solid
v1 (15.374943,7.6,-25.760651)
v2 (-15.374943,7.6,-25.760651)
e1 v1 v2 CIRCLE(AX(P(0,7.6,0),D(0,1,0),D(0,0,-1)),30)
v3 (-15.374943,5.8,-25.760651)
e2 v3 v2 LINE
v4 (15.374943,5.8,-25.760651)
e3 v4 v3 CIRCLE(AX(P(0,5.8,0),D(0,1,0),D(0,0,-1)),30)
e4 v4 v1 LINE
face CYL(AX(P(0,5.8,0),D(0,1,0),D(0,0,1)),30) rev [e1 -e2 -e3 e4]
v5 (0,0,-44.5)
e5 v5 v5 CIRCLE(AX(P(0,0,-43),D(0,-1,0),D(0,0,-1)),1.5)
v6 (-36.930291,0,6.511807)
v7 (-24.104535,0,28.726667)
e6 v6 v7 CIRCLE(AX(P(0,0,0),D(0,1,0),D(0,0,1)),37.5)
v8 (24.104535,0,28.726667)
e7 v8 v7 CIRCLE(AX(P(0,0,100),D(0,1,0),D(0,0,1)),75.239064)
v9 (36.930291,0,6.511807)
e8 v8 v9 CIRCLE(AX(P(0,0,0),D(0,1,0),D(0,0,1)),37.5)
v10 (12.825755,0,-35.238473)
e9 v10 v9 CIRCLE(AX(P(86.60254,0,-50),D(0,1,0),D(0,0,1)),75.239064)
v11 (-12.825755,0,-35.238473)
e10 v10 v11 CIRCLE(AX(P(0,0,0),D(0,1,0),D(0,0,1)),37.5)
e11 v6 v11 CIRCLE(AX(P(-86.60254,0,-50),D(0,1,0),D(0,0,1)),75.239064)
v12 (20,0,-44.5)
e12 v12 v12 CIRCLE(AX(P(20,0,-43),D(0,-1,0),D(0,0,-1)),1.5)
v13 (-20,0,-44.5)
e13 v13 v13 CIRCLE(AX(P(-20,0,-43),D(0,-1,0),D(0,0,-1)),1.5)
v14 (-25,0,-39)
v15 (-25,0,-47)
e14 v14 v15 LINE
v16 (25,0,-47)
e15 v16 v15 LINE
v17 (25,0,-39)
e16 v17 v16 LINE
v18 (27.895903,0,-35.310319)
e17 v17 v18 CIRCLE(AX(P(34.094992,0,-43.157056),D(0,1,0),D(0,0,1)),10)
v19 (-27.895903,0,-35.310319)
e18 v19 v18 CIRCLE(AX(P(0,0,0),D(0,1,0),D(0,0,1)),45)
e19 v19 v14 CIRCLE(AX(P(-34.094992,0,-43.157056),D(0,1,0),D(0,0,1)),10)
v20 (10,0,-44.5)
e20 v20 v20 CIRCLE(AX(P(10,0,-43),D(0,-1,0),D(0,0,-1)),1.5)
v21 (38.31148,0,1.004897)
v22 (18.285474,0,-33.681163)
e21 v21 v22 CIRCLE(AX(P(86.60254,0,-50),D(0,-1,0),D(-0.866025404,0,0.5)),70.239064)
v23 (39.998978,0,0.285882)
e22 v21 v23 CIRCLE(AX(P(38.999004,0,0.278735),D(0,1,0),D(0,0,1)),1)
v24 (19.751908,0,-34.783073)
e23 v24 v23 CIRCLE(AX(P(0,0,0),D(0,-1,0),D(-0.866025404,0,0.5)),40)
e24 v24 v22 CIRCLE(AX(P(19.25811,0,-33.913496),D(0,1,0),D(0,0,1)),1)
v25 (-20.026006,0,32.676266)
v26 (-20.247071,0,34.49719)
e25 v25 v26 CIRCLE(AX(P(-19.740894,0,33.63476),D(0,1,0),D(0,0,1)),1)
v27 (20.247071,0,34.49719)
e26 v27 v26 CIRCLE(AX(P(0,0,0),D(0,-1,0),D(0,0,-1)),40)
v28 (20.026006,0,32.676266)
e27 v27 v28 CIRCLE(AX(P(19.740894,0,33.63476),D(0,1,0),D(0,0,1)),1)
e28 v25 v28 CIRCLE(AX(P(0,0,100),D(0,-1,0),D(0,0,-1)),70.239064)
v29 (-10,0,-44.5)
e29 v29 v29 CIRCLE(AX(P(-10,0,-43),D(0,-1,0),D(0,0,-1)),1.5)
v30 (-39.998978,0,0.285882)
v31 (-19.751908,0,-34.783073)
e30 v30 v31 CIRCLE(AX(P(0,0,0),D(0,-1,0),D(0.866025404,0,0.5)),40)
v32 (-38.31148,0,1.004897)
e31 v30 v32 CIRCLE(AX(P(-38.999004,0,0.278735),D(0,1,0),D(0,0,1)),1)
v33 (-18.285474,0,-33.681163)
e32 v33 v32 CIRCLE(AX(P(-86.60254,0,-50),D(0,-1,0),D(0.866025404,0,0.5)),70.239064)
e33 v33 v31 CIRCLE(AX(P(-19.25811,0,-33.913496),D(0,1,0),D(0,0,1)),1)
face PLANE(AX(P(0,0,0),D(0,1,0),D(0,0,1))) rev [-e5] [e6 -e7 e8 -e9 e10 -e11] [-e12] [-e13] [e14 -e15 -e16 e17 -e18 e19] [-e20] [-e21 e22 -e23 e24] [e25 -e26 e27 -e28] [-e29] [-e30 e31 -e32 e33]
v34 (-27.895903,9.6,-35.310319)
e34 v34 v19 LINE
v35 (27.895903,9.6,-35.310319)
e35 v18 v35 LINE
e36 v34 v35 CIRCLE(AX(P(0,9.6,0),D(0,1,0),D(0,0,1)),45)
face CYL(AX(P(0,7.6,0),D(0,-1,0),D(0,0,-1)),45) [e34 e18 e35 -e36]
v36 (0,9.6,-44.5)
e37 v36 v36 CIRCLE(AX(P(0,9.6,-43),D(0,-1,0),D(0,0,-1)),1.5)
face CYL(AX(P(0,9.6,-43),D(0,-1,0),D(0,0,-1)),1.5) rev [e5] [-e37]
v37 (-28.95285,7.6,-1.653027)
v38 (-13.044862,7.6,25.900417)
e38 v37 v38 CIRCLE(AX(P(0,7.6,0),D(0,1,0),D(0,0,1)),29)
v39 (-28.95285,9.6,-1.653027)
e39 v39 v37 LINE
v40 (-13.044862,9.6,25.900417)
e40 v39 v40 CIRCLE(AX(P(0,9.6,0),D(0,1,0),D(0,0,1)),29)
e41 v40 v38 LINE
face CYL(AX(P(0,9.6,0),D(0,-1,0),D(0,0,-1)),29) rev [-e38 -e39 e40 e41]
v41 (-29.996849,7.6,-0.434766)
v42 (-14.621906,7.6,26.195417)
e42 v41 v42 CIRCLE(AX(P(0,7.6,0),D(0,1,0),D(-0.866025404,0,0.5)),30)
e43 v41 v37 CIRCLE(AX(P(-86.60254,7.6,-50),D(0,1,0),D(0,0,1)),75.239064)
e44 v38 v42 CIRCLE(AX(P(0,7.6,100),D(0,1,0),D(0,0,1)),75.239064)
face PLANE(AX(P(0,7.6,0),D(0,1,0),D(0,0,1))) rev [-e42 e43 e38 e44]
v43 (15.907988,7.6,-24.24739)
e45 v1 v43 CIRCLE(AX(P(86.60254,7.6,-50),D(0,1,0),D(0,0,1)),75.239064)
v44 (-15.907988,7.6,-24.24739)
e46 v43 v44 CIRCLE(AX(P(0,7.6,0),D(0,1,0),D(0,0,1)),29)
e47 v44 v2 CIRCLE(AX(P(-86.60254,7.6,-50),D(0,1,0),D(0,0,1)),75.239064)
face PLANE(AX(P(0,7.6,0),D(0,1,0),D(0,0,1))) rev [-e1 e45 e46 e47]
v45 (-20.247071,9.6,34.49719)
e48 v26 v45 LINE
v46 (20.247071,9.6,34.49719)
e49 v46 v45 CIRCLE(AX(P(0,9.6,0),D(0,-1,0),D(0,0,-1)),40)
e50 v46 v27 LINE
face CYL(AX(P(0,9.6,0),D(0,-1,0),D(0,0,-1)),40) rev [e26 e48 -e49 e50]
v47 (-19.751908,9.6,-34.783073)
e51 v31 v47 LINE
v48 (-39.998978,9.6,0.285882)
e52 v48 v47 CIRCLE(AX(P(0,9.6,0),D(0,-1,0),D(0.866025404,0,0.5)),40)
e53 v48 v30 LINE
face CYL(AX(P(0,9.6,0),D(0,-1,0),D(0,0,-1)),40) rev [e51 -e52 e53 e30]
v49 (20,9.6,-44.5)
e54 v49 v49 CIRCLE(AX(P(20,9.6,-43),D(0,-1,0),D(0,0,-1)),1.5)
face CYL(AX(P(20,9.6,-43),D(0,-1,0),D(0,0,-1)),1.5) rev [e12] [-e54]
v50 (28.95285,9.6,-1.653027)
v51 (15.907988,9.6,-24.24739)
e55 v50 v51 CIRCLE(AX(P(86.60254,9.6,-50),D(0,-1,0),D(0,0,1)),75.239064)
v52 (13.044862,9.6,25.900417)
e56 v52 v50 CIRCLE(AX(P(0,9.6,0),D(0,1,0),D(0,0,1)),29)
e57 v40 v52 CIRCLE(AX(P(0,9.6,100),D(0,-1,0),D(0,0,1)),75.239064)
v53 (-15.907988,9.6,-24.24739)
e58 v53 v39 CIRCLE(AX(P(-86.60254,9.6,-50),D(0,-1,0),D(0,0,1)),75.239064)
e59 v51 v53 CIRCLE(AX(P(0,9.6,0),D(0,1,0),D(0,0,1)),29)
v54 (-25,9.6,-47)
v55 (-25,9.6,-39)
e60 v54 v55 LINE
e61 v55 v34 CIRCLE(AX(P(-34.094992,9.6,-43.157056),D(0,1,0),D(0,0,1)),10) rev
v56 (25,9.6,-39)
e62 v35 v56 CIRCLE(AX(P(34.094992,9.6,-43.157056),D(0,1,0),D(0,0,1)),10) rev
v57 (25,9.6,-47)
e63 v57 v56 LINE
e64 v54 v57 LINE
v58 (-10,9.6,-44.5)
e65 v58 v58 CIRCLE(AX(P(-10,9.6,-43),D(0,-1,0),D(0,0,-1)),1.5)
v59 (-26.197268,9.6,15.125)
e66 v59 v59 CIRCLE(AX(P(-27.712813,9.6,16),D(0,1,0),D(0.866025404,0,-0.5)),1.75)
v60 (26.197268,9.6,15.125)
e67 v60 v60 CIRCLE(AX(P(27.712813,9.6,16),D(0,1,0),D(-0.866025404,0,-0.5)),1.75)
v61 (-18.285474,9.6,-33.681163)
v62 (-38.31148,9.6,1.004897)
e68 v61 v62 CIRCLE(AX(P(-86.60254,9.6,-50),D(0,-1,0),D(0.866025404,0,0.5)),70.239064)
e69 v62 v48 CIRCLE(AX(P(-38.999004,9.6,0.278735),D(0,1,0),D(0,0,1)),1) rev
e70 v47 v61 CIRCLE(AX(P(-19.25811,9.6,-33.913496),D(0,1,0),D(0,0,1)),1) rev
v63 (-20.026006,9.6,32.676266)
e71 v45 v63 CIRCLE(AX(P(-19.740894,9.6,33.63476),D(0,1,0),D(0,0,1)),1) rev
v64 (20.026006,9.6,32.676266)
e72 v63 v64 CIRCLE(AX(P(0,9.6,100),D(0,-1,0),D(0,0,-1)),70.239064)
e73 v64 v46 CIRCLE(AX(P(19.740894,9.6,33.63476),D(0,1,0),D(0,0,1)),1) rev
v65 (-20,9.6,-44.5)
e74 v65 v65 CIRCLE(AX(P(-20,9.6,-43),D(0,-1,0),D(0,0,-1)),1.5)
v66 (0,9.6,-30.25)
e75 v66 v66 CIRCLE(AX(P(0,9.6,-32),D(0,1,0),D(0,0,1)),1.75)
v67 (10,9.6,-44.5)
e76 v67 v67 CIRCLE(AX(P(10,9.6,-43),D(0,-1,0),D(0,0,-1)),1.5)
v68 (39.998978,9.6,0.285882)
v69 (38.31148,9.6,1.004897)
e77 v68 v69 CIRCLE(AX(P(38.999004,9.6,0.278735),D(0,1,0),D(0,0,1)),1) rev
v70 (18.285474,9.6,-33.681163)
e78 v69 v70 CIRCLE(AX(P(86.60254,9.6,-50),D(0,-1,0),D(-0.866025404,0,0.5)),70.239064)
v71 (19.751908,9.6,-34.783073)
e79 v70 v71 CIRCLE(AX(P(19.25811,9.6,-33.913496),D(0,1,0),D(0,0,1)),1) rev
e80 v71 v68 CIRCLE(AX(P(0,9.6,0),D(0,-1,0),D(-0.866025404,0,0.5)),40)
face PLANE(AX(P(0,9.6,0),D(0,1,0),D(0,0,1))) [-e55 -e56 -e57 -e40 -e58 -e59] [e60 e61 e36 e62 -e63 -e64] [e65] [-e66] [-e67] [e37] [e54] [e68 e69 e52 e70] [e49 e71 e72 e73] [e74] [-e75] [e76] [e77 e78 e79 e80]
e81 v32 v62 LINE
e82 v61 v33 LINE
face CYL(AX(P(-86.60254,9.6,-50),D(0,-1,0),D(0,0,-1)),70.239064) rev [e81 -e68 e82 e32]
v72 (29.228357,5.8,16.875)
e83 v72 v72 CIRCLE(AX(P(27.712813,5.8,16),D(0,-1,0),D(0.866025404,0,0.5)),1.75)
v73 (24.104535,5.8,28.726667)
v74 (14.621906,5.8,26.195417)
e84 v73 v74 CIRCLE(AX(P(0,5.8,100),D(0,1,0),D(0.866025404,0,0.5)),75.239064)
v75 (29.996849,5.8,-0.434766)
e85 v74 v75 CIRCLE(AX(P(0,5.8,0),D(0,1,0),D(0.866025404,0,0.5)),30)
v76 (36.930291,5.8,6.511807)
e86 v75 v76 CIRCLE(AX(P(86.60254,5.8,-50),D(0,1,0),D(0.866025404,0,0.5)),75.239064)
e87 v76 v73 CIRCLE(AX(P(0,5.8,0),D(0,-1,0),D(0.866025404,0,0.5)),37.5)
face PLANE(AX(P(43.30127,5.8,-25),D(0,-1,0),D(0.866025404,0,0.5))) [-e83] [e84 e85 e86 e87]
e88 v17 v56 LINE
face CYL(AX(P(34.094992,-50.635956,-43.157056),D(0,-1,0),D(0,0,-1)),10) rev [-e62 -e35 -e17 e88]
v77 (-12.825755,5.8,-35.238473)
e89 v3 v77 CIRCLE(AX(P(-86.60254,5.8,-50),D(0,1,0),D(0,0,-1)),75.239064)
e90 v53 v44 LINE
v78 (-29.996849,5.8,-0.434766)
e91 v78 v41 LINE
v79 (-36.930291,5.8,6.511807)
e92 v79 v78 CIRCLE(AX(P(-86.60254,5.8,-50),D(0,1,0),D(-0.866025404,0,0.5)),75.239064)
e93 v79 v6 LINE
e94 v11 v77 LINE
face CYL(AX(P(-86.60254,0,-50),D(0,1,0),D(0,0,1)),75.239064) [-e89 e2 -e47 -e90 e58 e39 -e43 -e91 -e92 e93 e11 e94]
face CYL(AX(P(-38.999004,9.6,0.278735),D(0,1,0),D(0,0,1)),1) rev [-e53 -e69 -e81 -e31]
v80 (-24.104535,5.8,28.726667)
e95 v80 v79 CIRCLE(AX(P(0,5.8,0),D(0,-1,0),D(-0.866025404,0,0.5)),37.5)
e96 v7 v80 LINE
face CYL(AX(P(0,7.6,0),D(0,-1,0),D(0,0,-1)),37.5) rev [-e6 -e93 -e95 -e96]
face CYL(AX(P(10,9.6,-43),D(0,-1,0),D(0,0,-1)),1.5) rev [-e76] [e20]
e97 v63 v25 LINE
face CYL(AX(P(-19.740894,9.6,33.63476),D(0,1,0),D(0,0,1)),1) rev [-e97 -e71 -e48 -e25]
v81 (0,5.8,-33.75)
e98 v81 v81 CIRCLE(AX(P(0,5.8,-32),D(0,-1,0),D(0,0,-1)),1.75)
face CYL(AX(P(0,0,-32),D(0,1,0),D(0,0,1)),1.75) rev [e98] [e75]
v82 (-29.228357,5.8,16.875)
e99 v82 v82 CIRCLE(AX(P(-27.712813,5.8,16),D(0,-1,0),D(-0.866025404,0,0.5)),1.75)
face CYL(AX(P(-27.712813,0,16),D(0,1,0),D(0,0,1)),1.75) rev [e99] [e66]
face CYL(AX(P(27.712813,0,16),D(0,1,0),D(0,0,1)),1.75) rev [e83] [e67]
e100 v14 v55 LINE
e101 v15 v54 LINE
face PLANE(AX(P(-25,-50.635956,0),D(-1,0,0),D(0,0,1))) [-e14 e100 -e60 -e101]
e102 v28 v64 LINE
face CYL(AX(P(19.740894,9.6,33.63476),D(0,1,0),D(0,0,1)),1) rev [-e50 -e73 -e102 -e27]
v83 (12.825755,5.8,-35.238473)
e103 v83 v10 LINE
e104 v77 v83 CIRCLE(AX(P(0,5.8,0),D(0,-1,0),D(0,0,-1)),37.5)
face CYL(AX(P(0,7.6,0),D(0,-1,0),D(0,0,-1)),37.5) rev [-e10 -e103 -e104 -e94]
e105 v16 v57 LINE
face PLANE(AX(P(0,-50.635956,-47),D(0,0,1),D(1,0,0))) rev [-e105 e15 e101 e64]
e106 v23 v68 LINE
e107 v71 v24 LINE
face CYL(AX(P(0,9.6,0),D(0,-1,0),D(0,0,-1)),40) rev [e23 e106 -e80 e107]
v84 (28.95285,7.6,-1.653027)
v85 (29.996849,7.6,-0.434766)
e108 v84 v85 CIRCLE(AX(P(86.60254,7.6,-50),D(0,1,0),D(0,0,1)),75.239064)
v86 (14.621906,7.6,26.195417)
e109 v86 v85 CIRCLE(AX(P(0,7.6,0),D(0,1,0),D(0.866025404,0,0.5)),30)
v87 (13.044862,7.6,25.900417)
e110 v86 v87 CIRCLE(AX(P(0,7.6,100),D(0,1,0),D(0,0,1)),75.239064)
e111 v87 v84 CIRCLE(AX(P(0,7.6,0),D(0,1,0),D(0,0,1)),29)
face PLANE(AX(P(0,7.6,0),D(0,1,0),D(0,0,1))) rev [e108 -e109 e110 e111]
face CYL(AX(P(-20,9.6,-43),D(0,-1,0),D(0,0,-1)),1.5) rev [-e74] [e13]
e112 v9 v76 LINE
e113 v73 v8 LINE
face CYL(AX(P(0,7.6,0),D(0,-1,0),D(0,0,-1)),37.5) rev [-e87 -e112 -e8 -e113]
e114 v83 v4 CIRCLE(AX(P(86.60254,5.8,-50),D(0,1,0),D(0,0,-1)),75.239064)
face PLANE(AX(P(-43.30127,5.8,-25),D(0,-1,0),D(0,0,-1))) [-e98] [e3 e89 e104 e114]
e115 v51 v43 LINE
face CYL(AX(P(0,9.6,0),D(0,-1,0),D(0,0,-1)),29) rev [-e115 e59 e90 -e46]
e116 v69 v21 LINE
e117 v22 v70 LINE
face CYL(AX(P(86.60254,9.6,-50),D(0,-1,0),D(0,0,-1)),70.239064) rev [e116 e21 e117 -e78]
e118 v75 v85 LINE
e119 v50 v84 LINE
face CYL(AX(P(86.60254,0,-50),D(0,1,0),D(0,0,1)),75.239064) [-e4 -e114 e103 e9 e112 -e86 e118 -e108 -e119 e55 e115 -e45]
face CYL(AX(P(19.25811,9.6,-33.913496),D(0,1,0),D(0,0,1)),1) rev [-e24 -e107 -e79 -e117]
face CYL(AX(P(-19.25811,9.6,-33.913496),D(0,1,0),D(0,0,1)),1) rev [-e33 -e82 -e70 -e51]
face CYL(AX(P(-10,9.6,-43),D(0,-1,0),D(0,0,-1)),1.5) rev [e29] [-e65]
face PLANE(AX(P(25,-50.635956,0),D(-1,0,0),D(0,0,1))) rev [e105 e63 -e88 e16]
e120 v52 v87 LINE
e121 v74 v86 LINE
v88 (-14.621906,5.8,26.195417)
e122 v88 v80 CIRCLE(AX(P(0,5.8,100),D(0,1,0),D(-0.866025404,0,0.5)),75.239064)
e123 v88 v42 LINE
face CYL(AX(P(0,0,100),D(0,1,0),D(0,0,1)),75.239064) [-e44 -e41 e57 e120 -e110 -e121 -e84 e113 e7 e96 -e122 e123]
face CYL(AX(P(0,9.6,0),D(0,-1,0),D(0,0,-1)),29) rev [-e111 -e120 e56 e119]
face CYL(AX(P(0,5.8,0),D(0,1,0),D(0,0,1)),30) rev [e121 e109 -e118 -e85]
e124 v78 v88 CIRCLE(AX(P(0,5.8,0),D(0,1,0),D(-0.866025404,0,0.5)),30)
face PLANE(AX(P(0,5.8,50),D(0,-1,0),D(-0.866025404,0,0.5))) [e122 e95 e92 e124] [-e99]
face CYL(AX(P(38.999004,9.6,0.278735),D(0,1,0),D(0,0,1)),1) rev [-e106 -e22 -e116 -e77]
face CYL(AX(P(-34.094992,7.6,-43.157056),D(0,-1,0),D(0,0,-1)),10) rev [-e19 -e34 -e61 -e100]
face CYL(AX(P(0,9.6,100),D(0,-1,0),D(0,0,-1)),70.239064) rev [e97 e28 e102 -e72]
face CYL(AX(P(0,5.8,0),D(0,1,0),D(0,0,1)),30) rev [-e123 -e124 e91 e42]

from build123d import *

# Parameters (mm, degrees)
SKETCH1_R                = 37.5
BOSS_EXTRUDE1_DEPTH      = 7.6
CUT_EXTRUDE2_START       = -7.6
CUT_EXTRUDE2_DEPTH       = 7.6
SKETCH4_R                = 45
SKETCH4_R_2              = 37.5
BOSS_EXTRUDE2_DEPTH      = 7.6
SKETCH6_R                = 45
BOSS_EXTRUDE3_DEPTH      = 2
SKETCH7_R                = 1.75
CUT_EXTRUDE3_DEPTH       = 65.359614666
CIRPATTERN2_COUNT        = 3
BOSS_EXTRUDE4_START      = -9.6
BOSS_EXTRUDE4_DEPTH      = 9.6
FILLET1_R                = 10
SKETCH12_R               = 1.5
CUT_EXTRUDE6_DEPTH       = 66.773550915
LPATTERN1_COUNT          = 10
LPATTERN1_PITCH          = 10
CUT_EXTRUDE7_DEPTH       = 66.773550915
FILLET3_R                = 1
CIRPATTERN3_COUNT        = 3
FILLET3_OF_CIRPATTERN3_R = 1
BOSS_EXTRUDE5_START      = 1.8
SKETCH14_R               = 1.75
BOSS_EXTRUDE5_DEPTH      = 1.8
CIRPATTERN4_COUNT        = 3


# Read off the part's stored shape, not the designer's step: Cut-Extrude2
with BuildPart() as part:
    # Sketch1 → Boss-Extrude1 (new body)
    with BuildSketch(Plane(origin=(0, 0, 0), x_dir=(1, 0, 0), z_dir=(0, 1, 0))):
        with Locations(Location((0, 0, 0), (0, 0, 90))):
            Circle(SKETCH1_R)
    extrude(amount=BOSS_EXTRUDE1_DEPTH)

    # Cut-Extrude2 outline → Cut-Extrude2 (cut)
    with BuildSketch(Plane(origin=(0, 7.6, 0), x_dir=(1, 0, 0), z_dir=(0, 1, 0)).offset(CUT_EXTRUDE2_START)):
        with BuildLine():
            ThreePointArc((-24.104535363, -28.726666617), (0, -24.760936498), (24.104535363, -28.726666617))
            ThreePointArc((24.104535363, -28.726666617), (32.475952642, -18.75), (36.930290738, -6.511806663))
            ThreePointArc((36.930290738, -6.511806663), (21.443600029, 12.380468249), (12.825755375, 35.238473279))
            ThreePointArc((12.825755375, 35.238473279), (0, 37.5), (-12.825755375, 35.238473279))
            ThreePointArc((-12.825755375, 35.238473279), (-21.443600029, 12.380468249), (-36.930290738, -6.511806663))
            ThreePointArc((-36.930290738, -6.511806663), (-32.475952642, -18.75), (-24.104535363, -28.726666617))
        make_face()
    extrude(amount=CUT_EXTRUDE2_DEPTH, mode=Mode.SUBTRACT)

    # Sketch4 → Boss-Extrude2 (add)
    with BuildSketch(Plane(origin=(0, 0, 0), x_dir=(1, 0, 0), z_dir=(0, 1, 0))):
        with Locations(Location((0, 0, 0), (0, 0, 90))):
            Circle(SKETCH4_R)
        Circle(SKETCH4_R_2, mode=Mode.SUBTRACT)
    extrude(amount=BOSS_EXTRUDE2_DEPTH)

    # Sketch6 → Boss-Extrude3 (add)
    with BuildSketch(Plane(origin=(0, 7.6, 0), x_dir=(1, 0, 0), z_dir=(0, 1, 0))):
        with Locations(Location((0, 0, 0), (0, 0, 90))):
            Circle(SKETCH6_R)
        with BuildLine():
            ThreePointArc((-28.952849653, 1.653026611), (-25.11473671, -14.5), (-13.044861788, -25.900416617))
            ThreePointArc((-13.044861788, -25.900416617), (0, -24.760936498), (13.044861788, -25.900416617))
            ThreePointArc((13.044861788, -25.900416617), (25.11473671, -14.5), (28.952849653, 1.653026611))
            ThreePointArc((28.952849653, 1.653026611), (21.443600029, 12.380468249), (15.907987865, 24.247390006))
            ThreePointArc((15.907987865, 24.247390006), (0, 29), (-15.907987865, 24.247390006))
            ThreePointArc((-15.907987865, 24.247390006), (-21.443600029, 12.380468249), (-28.952849653, 1.653026611))
        make_face(mode=Mode.SUBTRACT)
    extrude(amount=BOSS_EXTRUDE3_DEPTH)

    # Sketch7 → Cut-Extrude3 (cut, through all)
    with BuildSketch(Plane(origin=(0, 9.6, 0), x_dir=(1, 0, 0), z_dir=(0, 1, 0))):
        with Locations(Location((0, 32, 0), (0, 0, 270))):
            Circle(SKETCH7_R)
    cut_extrude3 = extrude(amount=-CUT_EXTRUDE3_DEPTH, mode=Mode.SUBTRACT)

    # CirPattern2: Cut-Extrude3 ×3 about axis
    cirpattern2_axis = Axis((0, 0, 0), (0, 1, 0))
    for i in range(1, CIRPATTERN2_COUNT):
        add(cut_extrude3.rotate(cirpattern2_axis, i * 360 / CIRPATTERN2_COUNT), mode=Mode.SUBTRACT)

    # Sketch11 → Boss-Extrude4 (add)
    with BuildSketch(Plane(origin=(0, 9.6, 0), x_dir=(1, 0, 0), z_dir=(0, 1, 0)).offset(BOSS_EXTRUDE4_START)):
        with BuildLine():
            ThreePointArc((-22.449944321, 39), (0, 45), (22.449944321, 39))
            Line((22.449944321, 39), (25, 39))
            Line((25, 39), (25, 47))
            Line((25, 47), (-25, 47))
            Line((-25, 47), (-25, 39))
            Line((-25, 39), (-22.449944321, 39))
        make_face()
    extrude(amount=BOSS_EXTRUDE4_DEPTH)

    # Fillet1
    # the kernel refuses this fillet: 10 mm, written as the material it adds along each edge
    with BuildSketch(Plane(origin=(-22.449944321, 0, -39), x_dir=(-0.8278845523725272, 0, 0.5608985362282026), z_dir=(0, 1, 0))) as fillet1_piece_1:
        with BuildLine():
            CenterArc((7.309068463, -9.973252989), FILLET1_R, 94.191525444, 27.126753117)
            Line((2.111151705, -1.430322498), (0, 0))
            ThreePointArc((0, 0), (3.289080808, -0.12036155), (6.578161616, 0))
        make_face()
    extrude(amount=9.6)
    with BuildSketch(Plane(origin=(22.449944321, 0, -39), x_dir=(0.8278845523725283, 0, 0.560898536228201), z_dir=(0, 1, 0))) as fillet1_piece_2:
        with BuildLine():
            CenterArc((7.309068463, 9.973252989), FILLET1_R, 238.681721439, 27.126753117)
            Line((2.111151705, 1.430322498), (0, 0))
            ThreePointArc((0, 0), (3.289080808, 0.12036155), (6.578161616, 0))
        make_face()
    extrude(amount=9.6)

    # Sketch12 → Cut-Extrude6 (cut, through all)
    with BuildSketch(Plane.XZ):
        with Locations(Location((-20, -43, 0), (0, 0, 270))):
            Circle(SKETCH12_R)
    cut_extrude6 = extrude(amount=-CUT_EXTRUDE6_DEPTH, mode=Mode.SUBTRACT)

    # LPattern1: Cut-Extrude6 ×10
    with Locations(*[(i * LPATTERN1_PITCH, 0, 0) for i in range(1, LPATTERN1_COUNT)]):
        add(cut_extrude6, mode=Mode.SUBTRACT)

    # Sketch13 → Cut-Extrude7 (cut, through all)
    with BuildSketch(Plane.XZ):
        with BuildLine():
            ThreePointArc((-22.11228446, 33.332369792), (0, 29.760936498), (22.11228446, 33.332369792))
            ThreePointArc((22.11228446, 33.332369792), (0, 40), (-22.11228446, 33.332369792))
        make_face()
    cut_extrude7 = extrude(amount=-CUT_EXTRUDE7_DEPTH, mode=Mode.SUBTRACT)

    # Fillet3
    fillet3_edges = [part.edges().sort_by_distance(p)[0] for p in [
        (-22.11228446, 4.8, 33.332369792),
        (22.11228446, 4.8, 33.332369792),
    ]]
    fillet(fillet3_edges, radius=FILLET3_R)

    # CirPattern3: Cut-Extrude7 ×3 about axis
    cirpattern3_axis = Axis((0, 0, 0), (0, 1, 0))
    for i in range(1, CIRPATTERN3_COUNT):
        add(cut_extrude7.rotate(cirpattern3_axis, i * 360 / CIRPATTERN3_COUNT), mode=Mode.SUBTRACT)

    # Fillet3 of CirPattern3
    fillet3_of_cirpattern3_edges = [part.edges().sort_by_distance(p)[0] for p in [
        (39.922821238, 4.8, 2.483615182),
        (17.810536778, 4.8, -35.815984974),
        (-17.810536778, 4.8, -35.815984974),
        (-39.922821238, 4.8, 2.483615182),
    ]]
    fillet(fillet3_of_cirpattern3_edges, radius=FILLET3_OF_CIRPATTERN3_R)

    # Sketch14 → Boss-Extrude5 (add)
    with BuildSketch(Plane.XZ.offset(-7.6).offset(BOSS_EXTRUDE5_START)):
        with BuildLine():
            ThreePointArc((-15.374943027, -25.760650747), (0, -30), (15.374943027, -25.760650747))
            ThreePointArc((15.374943027, -25.760650747), (13.94564115, -30.457951205), (12.825755375, -35.238473279))
            ThreePointArc((12.825755375, -35.238473279), (0, -37.5), (-12.825755375, -35.238473279))
            ThreePointArc((-12.825755375, -35.238473279), (-13.94564115, -30.457951205), (-15.374943027, -25.760650747))
        make_face()
        with Locations(Location((0, -32, 0), (0, 0, 90))):
            Circle(SKETCH14_R, mode=Mode.SUBTRACT)
    boss_extrude5 = extrude(amount=-BOSS_EXTRUDE5_DEPTH)

    # CirPattern4: Boss-Extrude5 ×3 about axis
    cirpattern4_axis = Axis((0, 7.6, 0), (0, -1, 0))
    for i in range(1, CIRPATTERN4_COUNT):
        add(boss_extrude5.rotate(cirpattern4_axis, i * 360 / CIRPATTERN4_COUNT))


solid = part.part
